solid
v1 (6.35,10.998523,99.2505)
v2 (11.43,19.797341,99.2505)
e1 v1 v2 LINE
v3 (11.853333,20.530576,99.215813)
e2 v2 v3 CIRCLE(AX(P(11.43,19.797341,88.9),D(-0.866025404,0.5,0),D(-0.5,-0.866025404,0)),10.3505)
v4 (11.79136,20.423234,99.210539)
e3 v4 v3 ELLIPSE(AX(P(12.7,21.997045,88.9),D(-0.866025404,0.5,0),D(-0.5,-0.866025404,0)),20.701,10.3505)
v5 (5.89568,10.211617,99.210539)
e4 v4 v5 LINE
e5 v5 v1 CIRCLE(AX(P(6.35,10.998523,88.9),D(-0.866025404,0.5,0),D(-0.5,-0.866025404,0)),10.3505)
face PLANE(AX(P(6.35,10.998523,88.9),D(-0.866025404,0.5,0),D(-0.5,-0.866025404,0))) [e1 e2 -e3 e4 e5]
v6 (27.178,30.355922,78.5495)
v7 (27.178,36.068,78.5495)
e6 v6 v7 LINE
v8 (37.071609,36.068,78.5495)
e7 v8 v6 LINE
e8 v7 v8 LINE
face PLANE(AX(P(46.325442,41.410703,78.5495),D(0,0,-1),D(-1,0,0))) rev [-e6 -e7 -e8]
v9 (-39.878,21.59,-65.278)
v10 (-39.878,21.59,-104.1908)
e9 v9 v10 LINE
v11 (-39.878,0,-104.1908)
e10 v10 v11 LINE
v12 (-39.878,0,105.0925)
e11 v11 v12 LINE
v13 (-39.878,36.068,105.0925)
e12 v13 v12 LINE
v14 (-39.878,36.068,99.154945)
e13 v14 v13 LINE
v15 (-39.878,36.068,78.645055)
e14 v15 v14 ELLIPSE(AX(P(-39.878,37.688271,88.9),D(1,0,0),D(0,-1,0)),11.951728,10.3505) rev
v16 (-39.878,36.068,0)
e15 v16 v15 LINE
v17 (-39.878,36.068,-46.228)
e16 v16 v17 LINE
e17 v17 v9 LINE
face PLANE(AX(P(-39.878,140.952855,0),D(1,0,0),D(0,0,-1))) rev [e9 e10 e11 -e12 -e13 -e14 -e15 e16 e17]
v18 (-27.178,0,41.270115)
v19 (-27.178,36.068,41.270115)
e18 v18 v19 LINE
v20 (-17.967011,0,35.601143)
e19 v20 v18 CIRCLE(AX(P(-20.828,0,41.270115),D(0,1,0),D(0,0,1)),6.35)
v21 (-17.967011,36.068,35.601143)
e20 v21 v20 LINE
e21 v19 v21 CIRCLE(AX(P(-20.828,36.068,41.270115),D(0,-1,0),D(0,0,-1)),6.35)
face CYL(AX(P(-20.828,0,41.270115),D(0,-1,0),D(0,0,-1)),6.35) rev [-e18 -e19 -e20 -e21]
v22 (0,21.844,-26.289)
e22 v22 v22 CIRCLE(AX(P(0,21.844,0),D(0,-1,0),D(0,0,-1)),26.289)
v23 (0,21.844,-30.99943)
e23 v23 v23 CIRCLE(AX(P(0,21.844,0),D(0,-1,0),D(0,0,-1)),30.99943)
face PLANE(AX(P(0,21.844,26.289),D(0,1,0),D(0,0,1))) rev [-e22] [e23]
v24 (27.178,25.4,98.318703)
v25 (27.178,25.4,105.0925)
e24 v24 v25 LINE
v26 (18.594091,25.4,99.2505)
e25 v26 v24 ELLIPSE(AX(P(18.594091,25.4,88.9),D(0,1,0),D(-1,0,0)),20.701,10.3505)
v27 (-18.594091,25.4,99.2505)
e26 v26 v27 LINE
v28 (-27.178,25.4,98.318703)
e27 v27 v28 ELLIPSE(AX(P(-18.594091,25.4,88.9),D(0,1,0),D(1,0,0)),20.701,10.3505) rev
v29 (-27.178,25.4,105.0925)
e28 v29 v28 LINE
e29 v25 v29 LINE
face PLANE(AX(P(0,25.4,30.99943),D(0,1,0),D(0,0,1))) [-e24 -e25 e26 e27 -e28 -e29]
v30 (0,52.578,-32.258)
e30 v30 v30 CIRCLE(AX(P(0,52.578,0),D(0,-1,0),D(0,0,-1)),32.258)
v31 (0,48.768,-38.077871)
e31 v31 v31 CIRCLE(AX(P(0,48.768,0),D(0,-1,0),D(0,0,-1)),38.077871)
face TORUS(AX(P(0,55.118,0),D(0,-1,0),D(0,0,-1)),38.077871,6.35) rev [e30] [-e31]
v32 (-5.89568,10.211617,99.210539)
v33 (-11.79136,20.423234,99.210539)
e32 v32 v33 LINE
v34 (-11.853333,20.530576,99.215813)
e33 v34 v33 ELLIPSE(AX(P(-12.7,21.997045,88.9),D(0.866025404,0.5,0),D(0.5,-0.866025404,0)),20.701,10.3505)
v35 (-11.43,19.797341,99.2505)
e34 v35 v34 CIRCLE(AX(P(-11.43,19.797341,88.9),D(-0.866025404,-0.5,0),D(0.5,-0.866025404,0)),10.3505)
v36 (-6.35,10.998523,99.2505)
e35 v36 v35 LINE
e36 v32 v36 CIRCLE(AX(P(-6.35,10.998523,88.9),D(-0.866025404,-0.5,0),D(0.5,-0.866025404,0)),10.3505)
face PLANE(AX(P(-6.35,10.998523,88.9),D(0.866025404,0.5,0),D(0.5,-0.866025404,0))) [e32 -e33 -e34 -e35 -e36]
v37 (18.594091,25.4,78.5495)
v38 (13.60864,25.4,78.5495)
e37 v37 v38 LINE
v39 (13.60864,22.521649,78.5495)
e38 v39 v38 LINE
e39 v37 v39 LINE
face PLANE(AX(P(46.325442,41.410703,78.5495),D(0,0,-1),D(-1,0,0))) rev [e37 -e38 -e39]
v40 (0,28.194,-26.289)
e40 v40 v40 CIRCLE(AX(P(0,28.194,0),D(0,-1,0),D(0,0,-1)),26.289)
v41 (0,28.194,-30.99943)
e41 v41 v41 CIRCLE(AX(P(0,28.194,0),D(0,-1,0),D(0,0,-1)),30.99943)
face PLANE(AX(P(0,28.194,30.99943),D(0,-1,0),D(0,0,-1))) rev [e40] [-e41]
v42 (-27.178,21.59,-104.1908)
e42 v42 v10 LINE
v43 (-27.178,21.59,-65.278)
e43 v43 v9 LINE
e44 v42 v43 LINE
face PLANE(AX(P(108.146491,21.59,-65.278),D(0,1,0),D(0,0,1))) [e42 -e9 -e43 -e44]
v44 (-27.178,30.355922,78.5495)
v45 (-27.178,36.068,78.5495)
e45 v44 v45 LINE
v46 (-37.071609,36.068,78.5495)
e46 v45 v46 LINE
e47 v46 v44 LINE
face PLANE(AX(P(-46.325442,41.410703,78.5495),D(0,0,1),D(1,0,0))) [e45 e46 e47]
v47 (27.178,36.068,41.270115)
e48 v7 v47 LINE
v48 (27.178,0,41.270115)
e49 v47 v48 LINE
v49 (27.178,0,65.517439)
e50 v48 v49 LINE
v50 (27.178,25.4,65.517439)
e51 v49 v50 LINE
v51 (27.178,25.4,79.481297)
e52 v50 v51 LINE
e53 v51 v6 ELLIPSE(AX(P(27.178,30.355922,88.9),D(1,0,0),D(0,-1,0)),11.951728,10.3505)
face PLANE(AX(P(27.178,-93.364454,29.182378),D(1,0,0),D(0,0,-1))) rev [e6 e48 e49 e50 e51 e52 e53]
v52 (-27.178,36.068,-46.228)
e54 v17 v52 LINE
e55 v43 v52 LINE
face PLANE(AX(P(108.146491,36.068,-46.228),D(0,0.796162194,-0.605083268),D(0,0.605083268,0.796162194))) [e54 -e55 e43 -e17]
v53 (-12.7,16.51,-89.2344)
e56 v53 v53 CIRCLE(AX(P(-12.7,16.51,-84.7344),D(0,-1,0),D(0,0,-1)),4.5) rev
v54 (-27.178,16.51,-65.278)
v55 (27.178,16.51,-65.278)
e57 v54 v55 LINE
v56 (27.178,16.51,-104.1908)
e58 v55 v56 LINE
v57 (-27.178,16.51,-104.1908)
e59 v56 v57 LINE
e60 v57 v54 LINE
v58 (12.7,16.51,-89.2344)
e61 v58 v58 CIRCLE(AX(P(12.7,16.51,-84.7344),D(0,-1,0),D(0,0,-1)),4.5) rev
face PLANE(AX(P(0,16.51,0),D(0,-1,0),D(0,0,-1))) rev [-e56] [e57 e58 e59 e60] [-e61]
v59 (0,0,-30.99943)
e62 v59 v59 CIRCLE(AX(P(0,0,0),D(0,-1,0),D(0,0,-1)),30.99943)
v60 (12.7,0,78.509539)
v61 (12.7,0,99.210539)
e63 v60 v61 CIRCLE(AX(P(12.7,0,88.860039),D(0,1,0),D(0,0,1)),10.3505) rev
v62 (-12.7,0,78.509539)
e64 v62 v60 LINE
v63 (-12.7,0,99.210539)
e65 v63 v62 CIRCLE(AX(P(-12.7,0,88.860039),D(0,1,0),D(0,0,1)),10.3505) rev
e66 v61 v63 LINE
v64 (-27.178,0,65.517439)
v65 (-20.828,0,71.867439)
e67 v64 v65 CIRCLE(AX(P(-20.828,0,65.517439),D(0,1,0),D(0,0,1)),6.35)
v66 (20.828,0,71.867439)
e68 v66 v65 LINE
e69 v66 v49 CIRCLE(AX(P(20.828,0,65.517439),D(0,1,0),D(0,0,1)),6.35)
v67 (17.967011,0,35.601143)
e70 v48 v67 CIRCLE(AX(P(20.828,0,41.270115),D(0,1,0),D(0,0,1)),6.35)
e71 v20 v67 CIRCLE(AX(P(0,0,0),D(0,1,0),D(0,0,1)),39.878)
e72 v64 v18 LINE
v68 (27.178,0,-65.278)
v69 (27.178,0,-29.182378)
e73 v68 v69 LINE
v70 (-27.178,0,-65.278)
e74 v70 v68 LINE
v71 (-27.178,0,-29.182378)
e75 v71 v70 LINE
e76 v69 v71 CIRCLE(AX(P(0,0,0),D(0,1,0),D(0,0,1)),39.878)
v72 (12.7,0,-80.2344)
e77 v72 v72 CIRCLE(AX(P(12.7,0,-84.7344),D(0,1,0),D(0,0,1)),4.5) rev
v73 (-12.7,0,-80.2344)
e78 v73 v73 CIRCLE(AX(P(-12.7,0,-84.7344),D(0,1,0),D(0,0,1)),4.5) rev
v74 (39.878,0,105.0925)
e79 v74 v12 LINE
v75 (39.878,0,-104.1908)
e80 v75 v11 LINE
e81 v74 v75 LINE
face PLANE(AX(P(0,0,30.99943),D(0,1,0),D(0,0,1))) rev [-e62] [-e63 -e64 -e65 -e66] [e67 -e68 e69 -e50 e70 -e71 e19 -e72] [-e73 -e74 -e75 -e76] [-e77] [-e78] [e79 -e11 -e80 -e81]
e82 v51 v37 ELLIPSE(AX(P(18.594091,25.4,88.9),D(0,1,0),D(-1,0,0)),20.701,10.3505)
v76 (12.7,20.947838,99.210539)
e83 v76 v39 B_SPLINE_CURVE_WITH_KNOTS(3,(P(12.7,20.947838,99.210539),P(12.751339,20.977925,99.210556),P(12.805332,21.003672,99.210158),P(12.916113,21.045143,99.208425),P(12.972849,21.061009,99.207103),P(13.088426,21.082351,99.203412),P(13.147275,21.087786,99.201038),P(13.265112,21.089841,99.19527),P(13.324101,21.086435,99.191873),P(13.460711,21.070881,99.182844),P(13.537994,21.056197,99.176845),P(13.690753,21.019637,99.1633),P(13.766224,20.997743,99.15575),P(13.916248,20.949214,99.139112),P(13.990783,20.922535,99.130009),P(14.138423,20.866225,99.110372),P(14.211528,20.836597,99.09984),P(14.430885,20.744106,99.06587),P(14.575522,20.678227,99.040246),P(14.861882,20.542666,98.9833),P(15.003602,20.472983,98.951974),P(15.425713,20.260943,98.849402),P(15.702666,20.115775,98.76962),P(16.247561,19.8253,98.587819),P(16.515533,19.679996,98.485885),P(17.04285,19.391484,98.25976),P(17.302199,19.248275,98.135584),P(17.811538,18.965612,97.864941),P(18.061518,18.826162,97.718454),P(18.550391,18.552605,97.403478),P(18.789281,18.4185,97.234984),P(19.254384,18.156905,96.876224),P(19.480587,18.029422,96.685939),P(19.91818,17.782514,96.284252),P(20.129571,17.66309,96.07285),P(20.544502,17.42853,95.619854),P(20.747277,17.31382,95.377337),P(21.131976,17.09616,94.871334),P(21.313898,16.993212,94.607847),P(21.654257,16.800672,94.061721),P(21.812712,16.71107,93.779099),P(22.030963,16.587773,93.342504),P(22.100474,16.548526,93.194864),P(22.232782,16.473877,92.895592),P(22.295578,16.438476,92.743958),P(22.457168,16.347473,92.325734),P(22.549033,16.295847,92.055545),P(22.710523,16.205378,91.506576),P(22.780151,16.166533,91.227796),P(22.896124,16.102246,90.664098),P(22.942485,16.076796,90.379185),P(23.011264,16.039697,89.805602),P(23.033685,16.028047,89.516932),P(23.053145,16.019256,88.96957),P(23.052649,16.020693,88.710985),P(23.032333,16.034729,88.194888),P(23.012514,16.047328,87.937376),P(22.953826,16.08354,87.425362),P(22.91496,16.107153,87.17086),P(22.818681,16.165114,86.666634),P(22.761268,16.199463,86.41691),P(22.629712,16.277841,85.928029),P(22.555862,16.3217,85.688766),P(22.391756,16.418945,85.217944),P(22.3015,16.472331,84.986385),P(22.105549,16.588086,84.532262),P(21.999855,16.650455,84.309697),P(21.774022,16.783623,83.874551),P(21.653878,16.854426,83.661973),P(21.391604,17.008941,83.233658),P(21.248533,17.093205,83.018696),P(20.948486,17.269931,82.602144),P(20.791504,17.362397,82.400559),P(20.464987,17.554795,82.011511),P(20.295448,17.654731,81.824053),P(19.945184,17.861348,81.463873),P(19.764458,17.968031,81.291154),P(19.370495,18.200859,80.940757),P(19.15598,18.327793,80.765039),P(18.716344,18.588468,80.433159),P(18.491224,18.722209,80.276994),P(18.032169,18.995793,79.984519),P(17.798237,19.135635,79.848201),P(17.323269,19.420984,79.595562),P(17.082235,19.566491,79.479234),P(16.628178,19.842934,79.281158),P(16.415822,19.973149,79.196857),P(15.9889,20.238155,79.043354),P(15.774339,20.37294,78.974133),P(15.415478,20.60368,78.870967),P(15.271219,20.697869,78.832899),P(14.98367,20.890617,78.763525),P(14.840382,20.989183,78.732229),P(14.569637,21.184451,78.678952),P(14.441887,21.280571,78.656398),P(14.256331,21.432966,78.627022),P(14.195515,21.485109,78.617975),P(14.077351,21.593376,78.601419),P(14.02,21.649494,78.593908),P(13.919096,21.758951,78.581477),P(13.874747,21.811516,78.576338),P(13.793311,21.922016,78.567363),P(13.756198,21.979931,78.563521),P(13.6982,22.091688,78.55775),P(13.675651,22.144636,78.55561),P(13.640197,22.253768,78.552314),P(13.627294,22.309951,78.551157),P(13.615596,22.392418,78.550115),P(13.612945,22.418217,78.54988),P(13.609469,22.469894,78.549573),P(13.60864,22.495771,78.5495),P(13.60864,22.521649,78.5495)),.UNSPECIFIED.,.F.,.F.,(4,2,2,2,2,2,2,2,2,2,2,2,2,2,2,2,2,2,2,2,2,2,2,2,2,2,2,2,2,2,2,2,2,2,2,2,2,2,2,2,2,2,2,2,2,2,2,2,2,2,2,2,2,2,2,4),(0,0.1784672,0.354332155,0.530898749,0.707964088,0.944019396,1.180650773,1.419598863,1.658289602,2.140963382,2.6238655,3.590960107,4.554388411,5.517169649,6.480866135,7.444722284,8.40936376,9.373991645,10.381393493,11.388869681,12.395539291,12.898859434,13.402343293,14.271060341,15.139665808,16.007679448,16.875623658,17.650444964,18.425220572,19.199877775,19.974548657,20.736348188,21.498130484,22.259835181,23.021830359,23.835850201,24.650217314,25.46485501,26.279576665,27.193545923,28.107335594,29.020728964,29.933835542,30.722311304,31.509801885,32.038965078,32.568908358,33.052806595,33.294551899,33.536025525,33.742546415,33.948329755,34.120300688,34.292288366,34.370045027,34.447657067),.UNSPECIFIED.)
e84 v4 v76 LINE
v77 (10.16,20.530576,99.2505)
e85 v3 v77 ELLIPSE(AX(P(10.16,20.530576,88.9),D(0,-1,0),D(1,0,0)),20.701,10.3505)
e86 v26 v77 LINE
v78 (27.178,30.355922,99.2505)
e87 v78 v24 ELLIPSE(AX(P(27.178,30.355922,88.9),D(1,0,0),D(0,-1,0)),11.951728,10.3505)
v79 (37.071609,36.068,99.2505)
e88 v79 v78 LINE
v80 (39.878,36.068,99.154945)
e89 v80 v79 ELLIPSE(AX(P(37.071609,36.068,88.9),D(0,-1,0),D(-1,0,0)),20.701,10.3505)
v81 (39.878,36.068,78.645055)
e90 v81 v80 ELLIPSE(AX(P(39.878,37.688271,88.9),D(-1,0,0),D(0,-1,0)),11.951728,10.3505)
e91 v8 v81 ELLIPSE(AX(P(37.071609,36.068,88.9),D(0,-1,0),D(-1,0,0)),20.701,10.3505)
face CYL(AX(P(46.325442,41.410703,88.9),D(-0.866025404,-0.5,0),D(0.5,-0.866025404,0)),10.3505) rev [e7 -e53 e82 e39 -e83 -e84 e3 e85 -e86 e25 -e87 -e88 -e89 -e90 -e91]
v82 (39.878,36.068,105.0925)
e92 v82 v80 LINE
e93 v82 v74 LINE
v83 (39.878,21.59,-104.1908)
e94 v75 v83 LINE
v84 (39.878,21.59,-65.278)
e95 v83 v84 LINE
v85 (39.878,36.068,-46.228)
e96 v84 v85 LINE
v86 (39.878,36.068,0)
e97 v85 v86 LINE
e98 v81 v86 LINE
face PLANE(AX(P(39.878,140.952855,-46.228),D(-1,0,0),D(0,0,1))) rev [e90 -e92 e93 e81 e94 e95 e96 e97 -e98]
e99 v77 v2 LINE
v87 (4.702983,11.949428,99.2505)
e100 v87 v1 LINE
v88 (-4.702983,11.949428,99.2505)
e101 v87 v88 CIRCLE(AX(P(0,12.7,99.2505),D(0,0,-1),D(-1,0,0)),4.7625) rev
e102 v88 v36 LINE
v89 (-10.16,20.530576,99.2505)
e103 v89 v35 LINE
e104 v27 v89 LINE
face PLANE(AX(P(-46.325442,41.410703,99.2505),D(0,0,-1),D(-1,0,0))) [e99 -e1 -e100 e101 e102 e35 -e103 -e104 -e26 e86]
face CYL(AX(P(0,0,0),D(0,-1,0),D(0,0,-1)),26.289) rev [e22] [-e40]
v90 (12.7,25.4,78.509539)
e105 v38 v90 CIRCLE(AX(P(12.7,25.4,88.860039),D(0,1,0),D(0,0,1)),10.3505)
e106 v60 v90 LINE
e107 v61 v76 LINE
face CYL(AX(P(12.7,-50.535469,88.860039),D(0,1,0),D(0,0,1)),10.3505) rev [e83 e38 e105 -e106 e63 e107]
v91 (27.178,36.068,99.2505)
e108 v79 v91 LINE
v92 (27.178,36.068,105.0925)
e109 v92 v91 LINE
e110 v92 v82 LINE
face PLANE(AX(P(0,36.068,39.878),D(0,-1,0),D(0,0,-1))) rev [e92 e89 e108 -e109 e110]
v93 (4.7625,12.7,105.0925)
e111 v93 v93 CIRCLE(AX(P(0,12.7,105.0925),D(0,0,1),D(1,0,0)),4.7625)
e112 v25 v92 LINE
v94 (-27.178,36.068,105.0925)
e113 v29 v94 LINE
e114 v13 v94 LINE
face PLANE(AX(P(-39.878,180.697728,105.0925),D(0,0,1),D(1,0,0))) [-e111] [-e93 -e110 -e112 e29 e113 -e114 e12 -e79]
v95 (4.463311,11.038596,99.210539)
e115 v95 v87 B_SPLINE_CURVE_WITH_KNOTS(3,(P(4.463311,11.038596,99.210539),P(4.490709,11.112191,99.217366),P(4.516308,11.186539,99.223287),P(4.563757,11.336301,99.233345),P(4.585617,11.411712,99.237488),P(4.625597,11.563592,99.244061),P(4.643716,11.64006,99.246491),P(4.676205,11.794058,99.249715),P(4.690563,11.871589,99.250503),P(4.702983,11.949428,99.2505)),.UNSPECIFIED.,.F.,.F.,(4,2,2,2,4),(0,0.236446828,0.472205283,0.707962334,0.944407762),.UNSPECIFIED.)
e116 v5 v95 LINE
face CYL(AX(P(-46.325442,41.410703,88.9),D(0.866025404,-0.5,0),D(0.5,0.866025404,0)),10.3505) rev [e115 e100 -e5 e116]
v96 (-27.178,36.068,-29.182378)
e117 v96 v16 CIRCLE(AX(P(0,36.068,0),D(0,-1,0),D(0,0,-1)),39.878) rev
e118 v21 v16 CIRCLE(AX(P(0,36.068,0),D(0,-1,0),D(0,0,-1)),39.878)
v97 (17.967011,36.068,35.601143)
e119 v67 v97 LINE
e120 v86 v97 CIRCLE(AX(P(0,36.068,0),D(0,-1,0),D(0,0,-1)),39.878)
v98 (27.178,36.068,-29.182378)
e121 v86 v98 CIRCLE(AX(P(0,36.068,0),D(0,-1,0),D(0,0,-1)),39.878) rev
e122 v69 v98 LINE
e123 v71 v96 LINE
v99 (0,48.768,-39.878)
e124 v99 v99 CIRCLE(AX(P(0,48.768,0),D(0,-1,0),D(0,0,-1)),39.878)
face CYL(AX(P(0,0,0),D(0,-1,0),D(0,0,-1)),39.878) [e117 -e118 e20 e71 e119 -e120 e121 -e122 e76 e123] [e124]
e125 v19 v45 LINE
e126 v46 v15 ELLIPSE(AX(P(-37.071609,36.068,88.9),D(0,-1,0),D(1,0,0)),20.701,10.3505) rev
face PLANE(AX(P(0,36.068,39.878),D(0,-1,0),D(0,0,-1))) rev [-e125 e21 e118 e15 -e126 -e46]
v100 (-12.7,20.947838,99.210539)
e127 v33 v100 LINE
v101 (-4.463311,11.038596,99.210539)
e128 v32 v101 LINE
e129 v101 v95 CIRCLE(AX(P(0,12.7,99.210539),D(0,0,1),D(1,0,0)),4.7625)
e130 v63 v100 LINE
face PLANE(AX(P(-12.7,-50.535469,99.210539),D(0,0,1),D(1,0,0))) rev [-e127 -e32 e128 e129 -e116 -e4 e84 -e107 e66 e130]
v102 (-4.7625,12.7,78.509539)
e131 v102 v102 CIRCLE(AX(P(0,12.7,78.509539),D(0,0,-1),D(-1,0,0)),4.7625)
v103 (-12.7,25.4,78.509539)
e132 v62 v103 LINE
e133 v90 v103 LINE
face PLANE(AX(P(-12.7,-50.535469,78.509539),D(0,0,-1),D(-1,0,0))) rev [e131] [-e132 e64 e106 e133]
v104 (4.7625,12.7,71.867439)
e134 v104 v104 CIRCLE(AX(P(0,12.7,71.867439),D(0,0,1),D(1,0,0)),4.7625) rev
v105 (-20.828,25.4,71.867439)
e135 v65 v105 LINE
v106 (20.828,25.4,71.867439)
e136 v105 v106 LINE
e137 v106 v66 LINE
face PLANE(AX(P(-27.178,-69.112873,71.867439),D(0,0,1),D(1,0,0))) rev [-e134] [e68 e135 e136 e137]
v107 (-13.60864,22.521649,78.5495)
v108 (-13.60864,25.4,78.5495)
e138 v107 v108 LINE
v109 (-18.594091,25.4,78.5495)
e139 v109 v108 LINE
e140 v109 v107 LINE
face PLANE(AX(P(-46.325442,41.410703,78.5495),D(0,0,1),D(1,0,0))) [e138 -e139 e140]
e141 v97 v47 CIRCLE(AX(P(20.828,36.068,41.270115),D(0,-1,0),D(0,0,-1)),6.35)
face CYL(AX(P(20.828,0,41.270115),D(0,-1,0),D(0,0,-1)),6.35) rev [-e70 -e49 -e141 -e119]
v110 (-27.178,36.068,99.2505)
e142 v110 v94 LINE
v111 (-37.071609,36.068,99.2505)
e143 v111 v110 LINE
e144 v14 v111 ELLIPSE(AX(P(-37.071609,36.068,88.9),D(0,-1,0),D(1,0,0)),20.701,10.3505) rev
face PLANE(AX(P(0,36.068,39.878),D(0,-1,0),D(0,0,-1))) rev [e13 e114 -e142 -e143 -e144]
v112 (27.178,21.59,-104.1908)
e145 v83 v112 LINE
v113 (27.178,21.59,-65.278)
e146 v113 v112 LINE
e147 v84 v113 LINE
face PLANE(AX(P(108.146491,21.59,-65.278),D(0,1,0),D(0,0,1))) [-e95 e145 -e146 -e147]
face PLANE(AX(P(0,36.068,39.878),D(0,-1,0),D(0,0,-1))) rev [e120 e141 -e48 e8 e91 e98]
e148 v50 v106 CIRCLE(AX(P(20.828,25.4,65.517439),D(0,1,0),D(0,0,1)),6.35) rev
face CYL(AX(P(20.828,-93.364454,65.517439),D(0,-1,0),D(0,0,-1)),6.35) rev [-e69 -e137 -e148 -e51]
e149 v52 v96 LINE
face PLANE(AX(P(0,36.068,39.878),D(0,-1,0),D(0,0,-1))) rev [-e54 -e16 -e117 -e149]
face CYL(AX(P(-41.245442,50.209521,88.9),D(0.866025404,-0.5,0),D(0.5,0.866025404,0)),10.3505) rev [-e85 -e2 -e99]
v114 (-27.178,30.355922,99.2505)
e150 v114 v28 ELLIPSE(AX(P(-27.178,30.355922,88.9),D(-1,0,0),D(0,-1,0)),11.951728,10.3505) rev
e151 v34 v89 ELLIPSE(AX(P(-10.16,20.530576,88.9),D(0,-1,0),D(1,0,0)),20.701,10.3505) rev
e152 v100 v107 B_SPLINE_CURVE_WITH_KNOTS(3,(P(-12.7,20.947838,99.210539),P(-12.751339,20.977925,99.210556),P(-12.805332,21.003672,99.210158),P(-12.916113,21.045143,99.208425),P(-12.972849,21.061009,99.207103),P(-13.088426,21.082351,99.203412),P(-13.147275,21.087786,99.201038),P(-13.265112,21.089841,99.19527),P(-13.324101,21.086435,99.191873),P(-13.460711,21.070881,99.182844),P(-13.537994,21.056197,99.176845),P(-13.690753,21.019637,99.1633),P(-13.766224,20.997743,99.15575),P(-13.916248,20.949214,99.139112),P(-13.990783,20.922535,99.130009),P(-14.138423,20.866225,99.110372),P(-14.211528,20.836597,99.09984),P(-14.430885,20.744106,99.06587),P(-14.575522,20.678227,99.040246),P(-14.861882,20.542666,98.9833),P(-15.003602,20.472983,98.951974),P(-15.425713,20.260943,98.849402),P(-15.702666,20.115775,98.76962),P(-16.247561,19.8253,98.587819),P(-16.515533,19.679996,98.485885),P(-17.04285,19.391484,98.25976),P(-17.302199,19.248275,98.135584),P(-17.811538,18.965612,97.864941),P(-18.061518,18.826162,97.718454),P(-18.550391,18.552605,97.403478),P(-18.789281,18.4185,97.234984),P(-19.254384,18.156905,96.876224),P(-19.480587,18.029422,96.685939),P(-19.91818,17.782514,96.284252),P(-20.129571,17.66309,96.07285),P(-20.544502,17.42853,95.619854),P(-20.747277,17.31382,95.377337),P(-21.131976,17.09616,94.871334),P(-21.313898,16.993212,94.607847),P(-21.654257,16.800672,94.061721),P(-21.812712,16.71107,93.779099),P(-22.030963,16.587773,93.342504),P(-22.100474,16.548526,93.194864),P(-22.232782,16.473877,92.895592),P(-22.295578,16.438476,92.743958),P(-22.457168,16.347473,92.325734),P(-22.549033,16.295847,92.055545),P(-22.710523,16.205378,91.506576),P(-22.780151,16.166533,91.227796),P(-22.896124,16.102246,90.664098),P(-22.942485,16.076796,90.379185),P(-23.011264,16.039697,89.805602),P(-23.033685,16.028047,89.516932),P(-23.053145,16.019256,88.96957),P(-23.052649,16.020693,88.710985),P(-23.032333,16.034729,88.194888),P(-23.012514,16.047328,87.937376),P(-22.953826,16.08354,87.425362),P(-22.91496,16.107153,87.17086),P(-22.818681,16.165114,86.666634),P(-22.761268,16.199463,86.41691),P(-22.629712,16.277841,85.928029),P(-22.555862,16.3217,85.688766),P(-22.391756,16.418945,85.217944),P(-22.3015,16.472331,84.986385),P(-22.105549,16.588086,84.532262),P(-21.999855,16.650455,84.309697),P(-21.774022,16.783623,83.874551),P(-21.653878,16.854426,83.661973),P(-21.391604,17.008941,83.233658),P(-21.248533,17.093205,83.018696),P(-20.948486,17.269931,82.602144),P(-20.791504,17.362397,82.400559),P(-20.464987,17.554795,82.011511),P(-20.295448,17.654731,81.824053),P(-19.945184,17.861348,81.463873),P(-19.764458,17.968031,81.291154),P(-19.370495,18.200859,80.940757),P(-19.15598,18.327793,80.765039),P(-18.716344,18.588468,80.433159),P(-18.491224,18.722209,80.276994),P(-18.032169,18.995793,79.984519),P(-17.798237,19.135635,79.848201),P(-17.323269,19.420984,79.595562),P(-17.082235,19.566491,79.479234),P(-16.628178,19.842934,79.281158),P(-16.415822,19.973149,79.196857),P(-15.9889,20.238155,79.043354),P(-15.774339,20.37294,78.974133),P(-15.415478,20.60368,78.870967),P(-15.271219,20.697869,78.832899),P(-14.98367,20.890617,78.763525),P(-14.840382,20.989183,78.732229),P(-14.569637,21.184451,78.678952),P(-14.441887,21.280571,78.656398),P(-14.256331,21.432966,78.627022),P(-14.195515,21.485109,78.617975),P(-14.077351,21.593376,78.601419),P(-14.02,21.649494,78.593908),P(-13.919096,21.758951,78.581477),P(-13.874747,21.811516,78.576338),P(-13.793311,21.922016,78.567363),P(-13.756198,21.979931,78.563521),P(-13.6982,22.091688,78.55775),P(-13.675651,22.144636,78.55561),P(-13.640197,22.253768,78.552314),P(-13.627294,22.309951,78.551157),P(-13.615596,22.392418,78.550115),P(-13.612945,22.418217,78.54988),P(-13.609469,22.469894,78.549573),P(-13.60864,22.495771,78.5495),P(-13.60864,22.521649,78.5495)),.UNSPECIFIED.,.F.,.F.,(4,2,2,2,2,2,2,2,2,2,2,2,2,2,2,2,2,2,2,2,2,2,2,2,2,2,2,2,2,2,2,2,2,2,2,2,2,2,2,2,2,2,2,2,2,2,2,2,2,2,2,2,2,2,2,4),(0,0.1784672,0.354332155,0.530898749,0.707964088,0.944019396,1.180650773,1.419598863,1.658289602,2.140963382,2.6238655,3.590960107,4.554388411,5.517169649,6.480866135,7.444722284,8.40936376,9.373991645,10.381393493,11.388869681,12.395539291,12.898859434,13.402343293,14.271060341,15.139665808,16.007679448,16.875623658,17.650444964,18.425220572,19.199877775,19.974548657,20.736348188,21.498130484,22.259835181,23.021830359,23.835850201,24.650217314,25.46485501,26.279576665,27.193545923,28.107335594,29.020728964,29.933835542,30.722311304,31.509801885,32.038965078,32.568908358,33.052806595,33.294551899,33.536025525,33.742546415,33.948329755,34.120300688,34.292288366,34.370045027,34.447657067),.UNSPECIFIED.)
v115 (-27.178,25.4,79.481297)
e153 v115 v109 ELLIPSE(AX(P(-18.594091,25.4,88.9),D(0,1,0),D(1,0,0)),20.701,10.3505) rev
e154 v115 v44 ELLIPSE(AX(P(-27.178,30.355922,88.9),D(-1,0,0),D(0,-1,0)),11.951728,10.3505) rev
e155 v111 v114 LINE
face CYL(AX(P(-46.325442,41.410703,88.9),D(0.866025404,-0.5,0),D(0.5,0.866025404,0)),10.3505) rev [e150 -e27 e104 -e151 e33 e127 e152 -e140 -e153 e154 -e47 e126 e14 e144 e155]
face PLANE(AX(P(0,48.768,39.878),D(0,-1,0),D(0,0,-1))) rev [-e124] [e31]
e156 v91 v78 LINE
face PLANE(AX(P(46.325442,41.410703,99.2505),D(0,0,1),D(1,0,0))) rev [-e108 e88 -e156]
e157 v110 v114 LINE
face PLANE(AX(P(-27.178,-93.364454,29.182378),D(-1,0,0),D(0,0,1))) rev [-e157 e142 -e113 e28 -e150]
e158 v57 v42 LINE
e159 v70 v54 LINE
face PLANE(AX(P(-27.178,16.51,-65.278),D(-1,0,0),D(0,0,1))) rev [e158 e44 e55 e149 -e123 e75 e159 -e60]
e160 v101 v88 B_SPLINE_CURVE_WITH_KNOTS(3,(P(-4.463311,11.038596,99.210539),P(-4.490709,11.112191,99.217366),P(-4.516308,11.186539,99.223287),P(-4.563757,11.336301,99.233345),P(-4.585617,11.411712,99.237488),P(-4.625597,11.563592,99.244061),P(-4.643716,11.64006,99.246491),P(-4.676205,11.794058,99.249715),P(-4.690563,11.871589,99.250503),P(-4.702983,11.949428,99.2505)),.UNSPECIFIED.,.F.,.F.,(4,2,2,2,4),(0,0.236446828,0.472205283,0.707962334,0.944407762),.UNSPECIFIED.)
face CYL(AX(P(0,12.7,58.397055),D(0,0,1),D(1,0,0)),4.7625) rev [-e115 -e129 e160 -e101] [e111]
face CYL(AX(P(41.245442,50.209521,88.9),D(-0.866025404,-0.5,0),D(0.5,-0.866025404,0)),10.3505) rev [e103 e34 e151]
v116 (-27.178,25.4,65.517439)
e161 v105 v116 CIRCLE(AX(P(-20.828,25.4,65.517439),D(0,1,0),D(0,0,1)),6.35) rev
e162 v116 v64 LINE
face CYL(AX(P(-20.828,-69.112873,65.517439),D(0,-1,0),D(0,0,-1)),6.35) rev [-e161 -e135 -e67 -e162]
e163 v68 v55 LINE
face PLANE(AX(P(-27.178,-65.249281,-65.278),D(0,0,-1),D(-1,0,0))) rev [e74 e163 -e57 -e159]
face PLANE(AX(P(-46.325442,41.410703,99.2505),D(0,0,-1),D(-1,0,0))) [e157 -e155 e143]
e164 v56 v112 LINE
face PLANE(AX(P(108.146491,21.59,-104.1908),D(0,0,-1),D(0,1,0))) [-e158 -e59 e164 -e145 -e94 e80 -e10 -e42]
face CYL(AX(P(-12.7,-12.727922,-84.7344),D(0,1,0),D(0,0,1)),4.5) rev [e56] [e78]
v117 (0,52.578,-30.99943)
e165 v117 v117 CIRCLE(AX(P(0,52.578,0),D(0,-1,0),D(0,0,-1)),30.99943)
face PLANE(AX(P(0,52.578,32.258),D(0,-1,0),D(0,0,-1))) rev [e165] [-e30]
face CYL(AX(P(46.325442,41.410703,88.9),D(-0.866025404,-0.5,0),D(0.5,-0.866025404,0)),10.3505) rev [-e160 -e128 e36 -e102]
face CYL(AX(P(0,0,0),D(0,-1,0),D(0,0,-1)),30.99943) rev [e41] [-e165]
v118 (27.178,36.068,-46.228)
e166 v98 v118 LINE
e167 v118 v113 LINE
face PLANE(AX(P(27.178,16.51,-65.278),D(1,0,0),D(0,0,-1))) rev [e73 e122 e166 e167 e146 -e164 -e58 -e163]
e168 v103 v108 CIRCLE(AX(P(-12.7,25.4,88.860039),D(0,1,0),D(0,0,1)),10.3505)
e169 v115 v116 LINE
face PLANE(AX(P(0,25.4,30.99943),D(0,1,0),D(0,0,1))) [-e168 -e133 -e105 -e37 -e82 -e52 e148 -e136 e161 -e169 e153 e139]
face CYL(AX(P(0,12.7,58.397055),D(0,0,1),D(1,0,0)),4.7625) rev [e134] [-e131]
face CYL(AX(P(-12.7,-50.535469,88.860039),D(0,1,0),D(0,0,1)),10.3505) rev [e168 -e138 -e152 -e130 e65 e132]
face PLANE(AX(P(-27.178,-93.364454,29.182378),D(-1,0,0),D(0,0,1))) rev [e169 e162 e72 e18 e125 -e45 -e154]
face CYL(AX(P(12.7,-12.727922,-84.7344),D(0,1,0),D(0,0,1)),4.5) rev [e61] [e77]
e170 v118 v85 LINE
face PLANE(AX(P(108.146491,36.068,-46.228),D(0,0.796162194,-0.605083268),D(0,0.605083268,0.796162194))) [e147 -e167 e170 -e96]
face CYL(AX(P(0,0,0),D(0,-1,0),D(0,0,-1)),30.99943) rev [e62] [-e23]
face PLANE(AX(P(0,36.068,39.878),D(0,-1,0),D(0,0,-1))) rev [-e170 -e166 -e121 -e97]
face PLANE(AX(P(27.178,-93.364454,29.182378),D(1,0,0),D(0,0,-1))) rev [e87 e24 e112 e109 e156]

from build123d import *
from build123d.topology import SkipClean

# Parameters (mm, degrees)
HOUSING_FILLET_LIP_R               = 6.35
UBJ_START                          = 36.068
UBJ_MATERIAL_PREP_DEPTH            = 36.068
UBJ_ARM_TK_DEPTH                   = 79.756
SKETCH32_R                         = 4.5
CAMBERBLOCK_HOLES_DEPTH            = 21.59
SKETCH28_W                         = 54.356
SKETCH28_H                         = 38.9128
UBJ_CROSS_MEMBER_TK_DEPTH          = 5.08
UBJ_MASS_CUTTING_REACH             = 119.247
LBJ_START                          = -36.068
LBJ_MATERIAL_PREP_DEPTH            = 36.068
FLAT_LBJ_PREP_DEPTH                = 10.668
LBJ_SLOT_REACH                     = 117.643
LBJ_WEIGHT_AND_BOLT_CLEARING_REACH = 117.643
LBJ_FILLET_R                       = 6.35
LBJ_HOLE_REACH                     = 221.441
SKETCH14_R                         = 4.7625
MOUTH_WIDEN_DEPTH                  = 125.09324931


with BuildPart() as part:
    # Bearing Sketch → Bearing Revolve (revolve)
    with BuildSketch(Plane(origin=(0, 0, 0), x_dir=(0, 0, -1), z_dir=(1, 0, 0)), mode=Mode.PRIVATE) as bearing_revolve_sk:
        Polygon((-39.878, 0), (-39.878, 48.768), (-32.258, 48.768), (-32.258, 52.578), (-30.99943, 52.578), (-30.99943, 28.194), (-26.289, 28.194), (-26.289, 21.844), (-30.99943, 21.844), (-30.99943, 0), align=None)
    revolve(bearing_revolve_sk.sketch.rotate(Axis((0, 0, 0), (0, 1, 0)), 180), axis=Axis((0, 0, 0), (0, 1, 0)))

    # Housing Fillet Lip
    # the kernel refuses this fillet: 6.35 mm, written as the material it adds along each edge
    with BuildSketch(Plane(origin=(0, 48.768, 0), x_dir=(0, 0, -1), z_dir=(1, 0, 0))) as housing_fillet_lip_piece_1:
        with BuildLine():
            CenterArc((38.077871133, 6.35), HOUSING_FILLET_LIP_R, 203.578178478, 66.421821522)
            Line((32.258, 3.81), (32.141602577, 3.7592))
            ThreePointArc((32.141602577, 3.7592), (32.131, 1.905), (32.131, 0))
            Line((32.131, 0), (32.258, -0.127))
            Line((32.258, -0.127), (38.077871133, -0.127))
            Line((38.077871133, -0.127), (38.077871133, 0))
        make_face()
    revolve(axis=Axis((0, 48.768, 0), (0, 1, 0)))

    # PrepArea(WithadjWidth) → UBJ Material Prep (add)
    with BuildSketch(Plane(origin=(0, 0, 0), x_dir=(1, 0, 0), z_dir=(0, 1, 0)).offset(UBJ_START)):
        with BuildLine():
            Line((-39.878, 0), (-39.878, 46.228))
            Line((-39.878, 46.228), (39.878, 46.228))
            Line((39.878, 46.228), (39.878, 0))
            ThreePointArc((39.878, 0), (0, 39.878), (-39.878, 0))
        make_face()
    extrude(amount=-UBJ_MATERIAL_PREP_DEPTH)

    # Sketch27 → UBJ Arm TK (add)
    with BuildSketch(Plane.ZY.offset(39.878)):
        Polygon((-46.228, 36.068), (-65.278, 21.59), (-104.1908, 21.59), (-104.1908, 0), (-91.959544072, 0), (-46.228, 0), align=None)
    extrude(amount=-UBJ_ARM_TK_DEPTH)

    # Sketch32 → CamberBlock Holes (cut)
    with BuildSketch(Plane(origin=(0, 21.59, 0), x_dir=(1, 0, 0), z_dir=(0, 1, 0))):
        with Locations(Location((-12.7, 84.7344, 0), (0, 0, 270))):
            Circle(SKETCH32_R)
        with Locations(Location((12.7, 84.7344, 0), (0, 0, 270))):
            Circle(SKETCH32_R)
    extrude(amount=-CAMBERBLOCK_HOLES_DEPTH, mode=Mode.SUBTRACT)

    # Sketch28 → UBJ Cross Member TK (cut)
    with BuildSketch(Plane(origin=(0, 21.59, 0), x_dir=(1, 0, 0), z_dir=(0, 1, 0))):
        with Locations((0, 84.7344)):
            Rectangle(SKETCH28_W, SKETCH28_H)
    extrude(amount=-UBJ_CROSS_MEMBER_TK_DEPTH, mode=Mode.SUBTRACT)

    # Sketch30 → UBJ Mass Cutting (cut, up to next)
    with BuildSketch(Plane(origin=(0, 36.068, 0), x_dir=(1, 0, 0), z_dir=(0, 1, 0)), mode=Mode.PRIVATE) as ubj_mass_cutting_sk1:
        with BuildLine():
            Line((-27.178, 65.278), (27.178, 65.278))
            Line((27.178, 65.278), (27.178, 29.182378244))
            ThreePointArc((27.178, 29.182378244), (0, 39.878), (-27.178, 29.182378244))
            Line((-27.178, 29.182378244), (-27.178, 65.278))
        make_face()
    ubj_mass_cutting_tool1 = extrude(ubj_mass_cutting_sk1.sketch, amount=-UBJ_MASS_CUTTING_REACH, mode=Mode.PRIVATE) & part.part
    add(ubj_mass_cutting_tool1.solids().sort_by_distance((0, 36.068, -50.735285))[0], mode=Mode.SUBTRACT)

    # Sketch9 → LBJ Material Prep (add)
    with BuildSketch(Plane.XZ.offset(LBJ_START)):
        with BuildLine():
            Line((-39.878, 0), (-39.878, 105.0925))
            Line((-39.878, 105.0925), (39.878, 105.0925))
            Line((39.878, 105.0925), (39.878, 0))
            ThreePointArc((39.878, 0), (0, 39.878), (-39.878, 0))
        make_face()
    extrude(amount=LBJ_MATERIAL_PREP_DEPTH)

    # Sketch10 → Flat LBJ Prep (cut)
    with SkipClean():  # the faces are left unmerged after this step: merging them gives an invalid solid
        with BuildSketch(Plane(origin=(0, 36.068, 0), x_dir=(1, 0, 0), z_dir=(0, 1, 0))):
            with BuildLine():
                Line((-27.178, -29.182378244), (-27.178, -105.0925))
                Line((-27.178, -105.0925), (27.178, -105.0925))
                Line((27.178, -105.0925), (27.178, -29.182378244))
                ThreePointArc((27.178, -29.182378244), (0, -39.878), (-27.178, -29.182378244))
            make_face()
        extrude(amount=-FLAT_LBJ_PREP_DEPTH, mode=Mode.SUBTRACT)

    # Sketch12 → LBJ Slot (cut, up to next)
    with BuildSketch(Plane(origin=(0, 25.4, 0), x_dir=(1, 0, 0), z_dir=(0, 1, 0)), mode=Mode.PRIVATE) as lbj_slot_sk1:
        with BuildLine():
            Line((-12.7, -78.509539434), (12.7, -78.509539434))
            ThreePointArc((12.7, -78.509539434), (23.0505, -88.860039434), (12.7, -99.210539434))
            Line((12.7, -99.210539434), (-12.7, -99.210539434))
            ThreePointArc((-12.7, -99.210539434), (-23.0505, -88.860039434), (-12.7, -78.509539434))
        make_face()
    lbj_slot_tool1 = extrude(lbj_slot_sk1.sketch, amount=-LBJ_SLOT_REACH, mode=Mode.PRIVATE) & part.part
    add(lbj_slot_tool1.solids().sort_by_distance((0, 25.4, 88.860039))[0], mode=Mode.SUBTRACT)

    # Sketch13 → LBJ Weight and Bolt Clearing (cut, up to next)
    with BuildSketch(Plane(origin=(0, 25.4, 0), x_dir=(1, 0, 0), z_dir=(0, 1, 0)), mode=Mode.PRIVATE) as lbj_weight_and_bolt_clearing_sk1:
        with BuildLine():
            Line((-27.178, -29.182378244), (-27.178, -71.867439434))
            Line((-27.178, -71.867439434), (27.178, -71.867439434))
            Line((27.178, -71.867439434), (27.178, -29.182378244))
            ThreePointArc((27.178, -29.182378244), (0, -39.878), (-27.178, -29.182378244))
        make_face()
    lbj_weight_and_bolt_clearing_tool1 = extrude(lbj_weight_and_bolt_clearing_sk1.sketch, amount=-LBJ_WEIGHT_AND_BOLT_CLEARING_REACH, mode=Mode.PRIVATE) & part.part
    add(lbj_weight_and_bolt_clearing_tool1.solids().sort_by_distance((0, 25.4, 54.061372))[0], mode=Mode.SUBTRACT)

    # LBJ Fillet
    # the kernel refuses this fillet: 6.35 mm, written as the material it adds along each edge
    with BuildSketch(Plane(origin=(-27.178, 25.4, 29.182378244), x_dir=(0.8204405839916299, 0, 0.5717317973835926), z_dir=(0, -1, 0))) as lbj_fillet_piece_1:
        with BuildLine():
            CenterArc((12.120741225, 6.286772968), LBJ_FILLET_R, 145.128922247, 116.778941593)
            Line((6.910943516, 9.917269881), (0, 0))
            ThreePointArc((0, 0), (5.613440626, 0.397065762), (11.226881252, 0))
        make_face()
    extrude(amount=25.4)
    with BuildSketch(Plane(origin=(27.178, 25.4, 29.182378244), x_dir=(-0.8204405839916303, 0, 0.5717317973835919), z_dir=(0, -1, 0))) as lbj_fillet_piece_2:
        with BuildLine():
            CenterArc((12.120741225, -6.286772968), LBJ_FILLET_R, 98.09213616, 116.778941593)
            Line((6.910943516, -9.917269881), (0, 0))
            ThreePointArc((0, 0), (5.613440626, -0.397065762), (11.226881252, 0))
        make_face()
    extrude(amount=25.4)
    with BuildSketch(Plane(origin=(27.178, 25.4, 71.867439434), x_dir=(0, 0, -1), z_dir=(0, -1, 0)), Plane(origin=(-27.178, 25.4, 71.867439434), x_dir=(1, 0, 0), z_dir=(0, -1, 0))) as lbj_fillet_piece_3:
        with BuildLine():
            CenterArc((LBJ_FILLET_R, -LBJ_FILLET_R), LBJ_FILLET_R, 90, 90)
            Line((0, -LBJ_FILLET_R), (0, 0))
            Line((0, 0), (LBJ_FILLET_R, 0))
        make_face()
    extrude(amount=25.4)
    with BuildSketch(Plane(origin=(27.178, 36.068, 29.182378244), x_dir=(-0.8204405839916303, 0, 0.5717317973835919), z_dir=(0, -1, 0))) as lbj_fillet_piece_4:
        with BuildLine():
            CenterArc((12.120741225, -6.286772968), LBJ_FILLET_R, 98.09213616, 116.778941593)
            Line((6.910943516, -9.917269881), (0, 0))
            ThreePointArc((0, 0), (5.613440626, -0.397065762), (11.226881252, 0))
        make_face()
    extrude(amount=10.668)
    with BuildSketch(Plane(origin=(-27.178, 36.068, 29.182378244), x_dir=(0.8204405839916299, 0, 0.5717317973835926), z_dir=(0, -1, 0))) as lbj_fillet_piece_5:
        with BuildLine():
            CenterArc((12.120741225, 6.286772968), LBJ_FILLET_R, 145.128922247, 116.778941593)
            Line((6.910943516, 9.917269881), (0, 0))
            ThreePointArc((0, 0), (5.613440626, 0.397065762), (11.226881252, 0))
        make_face()
    extrude(amount=10.668)

    # LBJ Hole: up to this face of the body (flat: up to its plane)
    lbj_hole_end = Plane(part.part.faces().sort_by_distance((0, 12.7, 71.867439434))[0])
    # Sketch14 → LBJ Hole (cut, up to the picked face)
    with BuildSketch(Plane.XY.offset(105.0925), mode=Mode.PRIVATE) as lbj_hole_sk1:
        with Locations((0, 12.7)):
            Circle(SKETCH14_R)
    lbj_hole_tool1 = split(extrude(lbj_hole_sk1.sketch, amount=-LBJ_HOLE_REACH, mode=Mode.PRIVATE), bisect_by=lbj_hole_end, keep=Keep.BOTH, mode=Mode.PRIVATE)
    add(lbj_hole_tool1.solids().sort_by(Axis((0, 12.7, 105.0925), (0, 0, -1)))[0], mode=Mode.SUBTRACT)

    # Sketch33 → Mouth Widen (cut, through all)
    with BuildSketch(Plane(origin=(0, 0, 0), x_dir=(0, 0, 1), z_dir=(-0.8660254037844398, 0.499999999999998, 0))):
        with BuildLine():
            Line((78.5495, 12.7), (78.5495, 22.86))
            ThreePointArc((78.5495, 22.86), (88.9, 33.2105), (99.2505, 22.86))
            Line((99.2505, 22.86), (99.2505, 12.7))
            ThreePointArc((99.2505, 12.7), (88.9, 2.3495), (78.5495, 12.7))
        make_face()
    mouth_widen = extrude(amount=MOUTH_WIDEN_DEPTH, mode=Mode.SUBTRACT)

    # Mouth Mirror: Mouth Widen across plane
    add(mouth_widen.mirror(Plane(origin=(0, 0, 0), x_dir=(0, 0, 1), z_dir=(1, 0, 0))), mode=Mode.SUBTRACT)


solid = part.part
